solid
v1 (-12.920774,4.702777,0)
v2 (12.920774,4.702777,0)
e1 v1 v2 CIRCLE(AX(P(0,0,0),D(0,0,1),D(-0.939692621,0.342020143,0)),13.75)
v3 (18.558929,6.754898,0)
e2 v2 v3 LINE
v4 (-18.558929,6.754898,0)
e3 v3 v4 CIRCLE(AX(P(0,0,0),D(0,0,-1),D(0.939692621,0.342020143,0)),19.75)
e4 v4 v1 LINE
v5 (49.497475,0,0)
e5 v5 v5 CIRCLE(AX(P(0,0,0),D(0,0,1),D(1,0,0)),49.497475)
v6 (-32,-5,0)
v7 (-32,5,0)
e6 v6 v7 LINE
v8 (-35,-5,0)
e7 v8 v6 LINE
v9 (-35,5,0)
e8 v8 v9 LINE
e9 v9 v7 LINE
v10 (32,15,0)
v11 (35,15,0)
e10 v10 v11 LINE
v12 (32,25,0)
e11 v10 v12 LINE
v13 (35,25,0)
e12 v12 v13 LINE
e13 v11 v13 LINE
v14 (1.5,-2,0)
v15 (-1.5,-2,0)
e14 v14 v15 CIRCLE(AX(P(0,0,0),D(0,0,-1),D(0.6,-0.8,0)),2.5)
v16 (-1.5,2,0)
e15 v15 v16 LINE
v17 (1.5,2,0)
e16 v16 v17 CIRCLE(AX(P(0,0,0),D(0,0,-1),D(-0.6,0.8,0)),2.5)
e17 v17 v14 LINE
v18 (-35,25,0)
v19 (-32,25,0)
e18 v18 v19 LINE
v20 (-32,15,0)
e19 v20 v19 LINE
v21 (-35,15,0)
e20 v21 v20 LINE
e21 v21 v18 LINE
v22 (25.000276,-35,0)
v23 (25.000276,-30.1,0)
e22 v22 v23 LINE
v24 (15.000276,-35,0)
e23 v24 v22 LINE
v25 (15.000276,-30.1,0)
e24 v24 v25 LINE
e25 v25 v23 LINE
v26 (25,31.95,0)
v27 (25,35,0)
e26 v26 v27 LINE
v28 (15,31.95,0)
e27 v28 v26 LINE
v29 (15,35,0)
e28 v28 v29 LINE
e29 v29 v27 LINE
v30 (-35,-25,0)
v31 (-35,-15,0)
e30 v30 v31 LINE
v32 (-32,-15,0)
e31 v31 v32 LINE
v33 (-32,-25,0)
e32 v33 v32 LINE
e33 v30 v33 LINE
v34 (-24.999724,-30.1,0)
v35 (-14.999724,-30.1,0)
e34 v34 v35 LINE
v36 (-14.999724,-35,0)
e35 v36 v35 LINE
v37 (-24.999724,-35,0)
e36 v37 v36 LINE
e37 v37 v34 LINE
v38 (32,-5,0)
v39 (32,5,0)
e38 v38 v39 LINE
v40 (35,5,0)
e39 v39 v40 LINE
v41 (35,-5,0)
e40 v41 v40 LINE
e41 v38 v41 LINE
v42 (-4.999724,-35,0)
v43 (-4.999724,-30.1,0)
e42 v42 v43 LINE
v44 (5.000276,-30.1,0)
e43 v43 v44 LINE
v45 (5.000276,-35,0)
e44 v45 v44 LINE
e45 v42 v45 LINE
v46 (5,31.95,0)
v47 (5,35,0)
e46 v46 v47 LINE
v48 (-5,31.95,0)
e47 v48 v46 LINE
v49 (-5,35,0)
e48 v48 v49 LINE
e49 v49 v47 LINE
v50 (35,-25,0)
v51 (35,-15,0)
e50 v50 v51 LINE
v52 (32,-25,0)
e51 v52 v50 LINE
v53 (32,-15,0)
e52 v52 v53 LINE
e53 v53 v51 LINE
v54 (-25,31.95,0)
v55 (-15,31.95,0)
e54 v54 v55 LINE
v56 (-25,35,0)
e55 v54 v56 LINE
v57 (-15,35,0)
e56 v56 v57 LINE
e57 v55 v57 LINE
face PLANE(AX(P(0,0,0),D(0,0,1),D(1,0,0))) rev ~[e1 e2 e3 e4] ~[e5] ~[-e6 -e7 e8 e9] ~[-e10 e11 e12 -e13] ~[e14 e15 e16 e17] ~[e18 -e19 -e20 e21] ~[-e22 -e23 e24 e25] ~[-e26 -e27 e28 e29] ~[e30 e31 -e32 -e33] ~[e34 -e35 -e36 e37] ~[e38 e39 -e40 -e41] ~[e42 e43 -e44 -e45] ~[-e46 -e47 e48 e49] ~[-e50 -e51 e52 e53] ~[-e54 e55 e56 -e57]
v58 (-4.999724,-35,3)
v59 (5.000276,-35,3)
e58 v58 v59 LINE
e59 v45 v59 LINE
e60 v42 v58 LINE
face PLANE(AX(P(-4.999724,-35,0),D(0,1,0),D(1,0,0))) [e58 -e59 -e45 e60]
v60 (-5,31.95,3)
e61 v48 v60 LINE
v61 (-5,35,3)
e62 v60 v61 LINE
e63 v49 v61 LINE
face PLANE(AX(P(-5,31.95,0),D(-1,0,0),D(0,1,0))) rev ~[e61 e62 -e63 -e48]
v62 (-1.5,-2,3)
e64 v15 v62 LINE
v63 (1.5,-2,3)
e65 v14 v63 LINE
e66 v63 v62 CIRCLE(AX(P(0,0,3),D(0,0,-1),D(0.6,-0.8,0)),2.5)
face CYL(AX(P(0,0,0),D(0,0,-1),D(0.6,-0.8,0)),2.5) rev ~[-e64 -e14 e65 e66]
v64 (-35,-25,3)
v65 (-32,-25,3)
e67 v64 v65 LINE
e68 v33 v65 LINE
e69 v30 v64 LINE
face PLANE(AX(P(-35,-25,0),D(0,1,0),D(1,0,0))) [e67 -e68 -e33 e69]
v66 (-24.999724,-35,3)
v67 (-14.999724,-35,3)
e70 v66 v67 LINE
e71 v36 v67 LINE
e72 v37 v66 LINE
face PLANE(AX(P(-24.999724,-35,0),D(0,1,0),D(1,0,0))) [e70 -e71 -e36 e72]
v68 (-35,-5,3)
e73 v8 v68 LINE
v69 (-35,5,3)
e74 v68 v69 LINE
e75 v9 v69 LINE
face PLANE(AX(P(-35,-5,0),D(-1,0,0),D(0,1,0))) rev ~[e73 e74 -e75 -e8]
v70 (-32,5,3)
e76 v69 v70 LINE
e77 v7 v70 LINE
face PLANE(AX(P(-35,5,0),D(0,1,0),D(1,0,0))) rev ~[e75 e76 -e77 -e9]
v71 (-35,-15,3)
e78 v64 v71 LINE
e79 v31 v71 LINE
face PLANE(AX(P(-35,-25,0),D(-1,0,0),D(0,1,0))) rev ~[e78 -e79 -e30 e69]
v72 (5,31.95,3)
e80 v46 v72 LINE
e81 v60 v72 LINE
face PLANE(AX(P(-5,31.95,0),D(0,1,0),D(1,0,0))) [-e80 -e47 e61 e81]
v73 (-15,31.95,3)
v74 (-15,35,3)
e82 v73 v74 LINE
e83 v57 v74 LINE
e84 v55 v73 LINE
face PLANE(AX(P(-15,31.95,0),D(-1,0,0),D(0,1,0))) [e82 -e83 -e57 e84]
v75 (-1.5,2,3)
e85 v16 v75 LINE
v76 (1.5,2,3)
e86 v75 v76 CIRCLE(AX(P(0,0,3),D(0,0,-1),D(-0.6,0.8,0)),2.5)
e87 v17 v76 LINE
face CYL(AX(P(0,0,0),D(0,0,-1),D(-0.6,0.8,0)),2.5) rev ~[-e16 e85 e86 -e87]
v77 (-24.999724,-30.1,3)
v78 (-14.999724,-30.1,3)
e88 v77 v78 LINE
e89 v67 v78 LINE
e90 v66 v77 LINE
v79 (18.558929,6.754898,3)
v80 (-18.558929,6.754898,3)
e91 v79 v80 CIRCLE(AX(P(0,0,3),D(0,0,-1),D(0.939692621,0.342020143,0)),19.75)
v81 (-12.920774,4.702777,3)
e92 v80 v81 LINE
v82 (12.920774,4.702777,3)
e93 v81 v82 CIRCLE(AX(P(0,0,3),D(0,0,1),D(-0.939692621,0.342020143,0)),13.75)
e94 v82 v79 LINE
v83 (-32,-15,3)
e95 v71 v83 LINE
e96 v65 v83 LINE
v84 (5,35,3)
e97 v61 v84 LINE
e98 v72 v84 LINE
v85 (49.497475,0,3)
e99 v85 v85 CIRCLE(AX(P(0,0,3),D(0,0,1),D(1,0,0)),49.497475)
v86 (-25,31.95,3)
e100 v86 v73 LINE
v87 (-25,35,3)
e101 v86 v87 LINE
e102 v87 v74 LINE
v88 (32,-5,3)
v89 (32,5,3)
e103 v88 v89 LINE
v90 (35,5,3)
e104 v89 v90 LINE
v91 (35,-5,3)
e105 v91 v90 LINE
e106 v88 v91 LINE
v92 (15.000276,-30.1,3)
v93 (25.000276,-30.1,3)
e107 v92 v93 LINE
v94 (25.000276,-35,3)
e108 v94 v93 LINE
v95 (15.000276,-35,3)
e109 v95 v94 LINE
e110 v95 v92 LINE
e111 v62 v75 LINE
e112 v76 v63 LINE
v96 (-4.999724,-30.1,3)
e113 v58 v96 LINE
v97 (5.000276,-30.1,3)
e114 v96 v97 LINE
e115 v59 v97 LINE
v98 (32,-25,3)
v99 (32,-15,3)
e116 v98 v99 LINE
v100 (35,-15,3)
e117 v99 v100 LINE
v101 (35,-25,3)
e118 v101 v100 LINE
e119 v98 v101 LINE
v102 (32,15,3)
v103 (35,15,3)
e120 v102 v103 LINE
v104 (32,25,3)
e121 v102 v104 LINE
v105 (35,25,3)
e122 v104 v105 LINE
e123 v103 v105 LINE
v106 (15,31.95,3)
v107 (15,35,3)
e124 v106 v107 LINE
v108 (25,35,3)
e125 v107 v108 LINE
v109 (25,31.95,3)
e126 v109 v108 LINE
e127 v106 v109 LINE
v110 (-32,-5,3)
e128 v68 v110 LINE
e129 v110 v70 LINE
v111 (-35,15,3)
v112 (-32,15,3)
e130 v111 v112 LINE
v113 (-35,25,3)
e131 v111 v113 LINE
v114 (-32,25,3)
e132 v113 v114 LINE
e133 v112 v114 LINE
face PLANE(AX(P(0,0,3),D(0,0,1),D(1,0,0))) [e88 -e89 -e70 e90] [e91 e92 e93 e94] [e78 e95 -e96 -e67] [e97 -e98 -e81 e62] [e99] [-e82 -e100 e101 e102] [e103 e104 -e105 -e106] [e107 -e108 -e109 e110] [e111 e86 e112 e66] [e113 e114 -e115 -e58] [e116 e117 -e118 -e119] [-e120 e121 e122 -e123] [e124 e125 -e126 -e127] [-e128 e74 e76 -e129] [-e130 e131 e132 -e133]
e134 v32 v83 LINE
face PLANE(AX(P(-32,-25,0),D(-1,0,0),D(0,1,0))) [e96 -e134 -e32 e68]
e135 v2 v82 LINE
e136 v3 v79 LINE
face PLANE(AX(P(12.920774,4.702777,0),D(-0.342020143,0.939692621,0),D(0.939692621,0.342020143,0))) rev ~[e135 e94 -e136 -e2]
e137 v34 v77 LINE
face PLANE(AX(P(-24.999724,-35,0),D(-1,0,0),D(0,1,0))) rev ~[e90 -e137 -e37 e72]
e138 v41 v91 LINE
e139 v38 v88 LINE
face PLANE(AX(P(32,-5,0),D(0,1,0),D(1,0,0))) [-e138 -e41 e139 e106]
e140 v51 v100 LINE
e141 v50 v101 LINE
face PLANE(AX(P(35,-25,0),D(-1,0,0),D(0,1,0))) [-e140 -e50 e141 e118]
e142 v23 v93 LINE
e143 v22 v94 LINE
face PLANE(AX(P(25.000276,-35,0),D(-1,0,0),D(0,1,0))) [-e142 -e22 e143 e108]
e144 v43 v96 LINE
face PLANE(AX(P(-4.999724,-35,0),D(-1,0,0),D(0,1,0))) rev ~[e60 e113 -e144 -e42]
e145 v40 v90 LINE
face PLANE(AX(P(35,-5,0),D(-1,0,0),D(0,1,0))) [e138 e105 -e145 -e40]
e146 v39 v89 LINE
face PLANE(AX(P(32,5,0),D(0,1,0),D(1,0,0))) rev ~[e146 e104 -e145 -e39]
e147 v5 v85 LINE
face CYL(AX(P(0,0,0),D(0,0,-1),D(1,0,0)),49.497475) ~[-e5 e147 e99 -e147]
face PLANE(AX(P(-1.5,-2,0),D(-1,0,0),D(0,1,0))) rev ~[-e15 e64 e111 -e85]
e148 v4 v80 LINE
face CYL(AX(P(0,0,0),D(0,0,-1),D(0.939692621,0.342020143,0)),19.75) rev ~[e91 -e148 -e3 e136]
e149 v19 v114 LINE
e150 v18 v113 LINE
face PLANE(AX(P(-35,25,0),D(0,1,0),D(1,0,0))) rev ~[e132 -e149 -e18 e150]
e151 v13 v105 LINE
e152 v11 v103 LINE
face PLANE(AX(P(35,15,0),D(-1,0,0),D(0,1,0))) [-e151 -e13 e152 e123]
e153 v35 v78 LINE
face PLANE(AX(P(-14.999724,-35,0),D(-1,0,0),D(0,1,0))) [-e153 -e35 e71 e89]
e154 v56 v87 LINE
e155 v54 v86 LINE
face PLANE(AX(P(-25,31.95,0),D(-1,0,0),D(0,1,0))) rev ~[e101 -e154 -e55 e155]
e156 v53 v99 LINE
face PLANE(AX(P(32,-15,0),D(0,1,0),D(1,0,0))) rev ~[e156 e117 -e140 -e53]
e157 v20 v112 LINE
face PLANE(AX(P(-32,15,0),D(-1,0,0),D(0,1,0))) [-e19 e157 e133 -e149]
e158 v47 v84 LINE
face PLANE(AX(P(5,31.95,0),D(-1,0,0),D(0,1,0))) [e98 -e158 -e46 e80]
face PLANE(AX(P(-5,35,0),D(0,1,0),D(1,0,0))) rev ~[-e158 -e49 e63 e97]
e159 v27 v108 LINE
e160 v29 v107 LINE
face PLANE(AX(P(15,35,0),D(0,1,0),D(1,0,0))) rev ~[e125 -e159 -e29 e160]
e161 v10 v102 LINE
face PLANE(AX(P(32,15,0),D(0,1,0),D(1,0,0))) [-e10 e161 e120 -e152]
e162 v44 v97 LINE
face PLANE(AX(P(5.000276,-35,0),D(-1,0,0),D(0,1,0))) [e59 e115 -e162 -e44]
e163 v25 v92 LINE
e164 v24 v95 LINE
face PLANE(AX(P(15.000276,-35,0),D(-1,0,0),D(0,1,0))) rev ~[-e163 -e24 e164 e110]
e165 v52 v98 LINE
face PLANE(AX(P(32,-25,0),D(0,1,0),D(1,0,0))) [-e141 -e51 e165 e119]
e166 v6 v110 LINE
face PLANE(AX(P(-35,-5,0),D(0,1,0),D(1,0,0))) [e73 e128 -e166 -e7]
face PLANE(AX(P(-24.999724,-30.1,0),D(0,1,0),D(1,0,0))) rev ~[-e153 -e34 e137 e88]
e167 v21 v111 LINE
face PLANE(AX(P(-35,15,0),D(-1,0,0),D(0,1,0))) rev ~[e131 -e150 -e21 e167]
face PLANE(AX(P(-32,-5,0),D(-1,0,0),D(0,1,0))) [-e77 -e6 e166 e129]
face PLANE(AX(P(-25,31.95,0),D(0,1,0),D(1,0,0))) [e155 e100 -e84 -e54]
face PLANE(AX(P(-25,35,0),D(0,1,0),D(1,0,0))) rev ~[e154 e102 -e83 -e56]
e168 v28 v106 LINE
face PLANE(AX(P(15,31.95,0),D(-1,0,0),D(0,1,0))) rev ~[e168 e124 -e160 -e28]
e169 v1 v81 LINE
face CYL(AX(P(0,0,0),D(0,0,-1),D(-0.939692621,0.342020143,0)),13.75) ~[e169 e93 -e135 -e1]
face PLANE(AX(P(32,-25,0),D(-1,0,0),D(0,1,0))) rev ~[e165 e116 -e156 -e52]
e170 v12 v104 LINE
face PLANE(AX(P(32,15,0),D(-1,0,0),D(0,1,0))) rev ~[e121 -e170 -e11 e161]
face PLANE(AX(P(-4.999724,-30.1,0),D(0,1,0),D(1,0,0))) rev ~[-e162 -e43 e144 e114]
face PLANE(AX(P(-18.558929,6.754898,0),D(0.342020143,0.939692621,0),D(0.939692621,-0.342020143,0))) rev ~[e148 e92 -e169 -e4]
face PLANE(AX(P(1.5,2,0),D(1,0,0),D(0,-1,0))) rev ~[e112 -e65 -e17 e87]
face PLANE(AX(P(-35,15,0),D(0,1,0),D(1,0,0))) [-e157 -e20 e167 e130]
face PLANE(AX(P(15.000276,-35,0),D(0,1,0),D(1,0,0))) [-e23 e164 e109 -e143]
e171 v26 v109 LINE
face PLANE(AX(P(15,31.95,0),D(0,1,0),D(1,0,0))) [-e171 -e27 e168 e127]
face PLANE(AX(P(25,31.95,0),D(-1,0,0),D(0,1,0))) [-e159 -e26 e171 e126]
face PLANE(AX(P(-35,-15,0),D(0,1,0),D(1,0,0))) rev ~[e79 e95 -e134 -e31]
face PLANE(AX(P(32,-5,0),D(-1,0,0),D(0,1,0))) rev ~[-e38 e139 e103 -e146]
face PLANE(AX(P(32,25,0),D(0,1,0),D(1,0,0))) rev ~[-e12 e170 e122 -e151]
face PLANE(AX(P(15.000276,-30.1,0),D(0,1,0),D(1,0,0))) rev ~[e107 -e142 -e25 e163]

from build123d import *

# Parameters (mm, degrees)
F0_R     = 49.4974746831
F0_W     = 10
F0_H     = 4.9
F0_W_2   = 3
F0_H_2   = 10
F0_H_3   = 3.05
F1_DEPTH = 3


with BuildPart() as f1:
    # F0 (on Top) → F1 (new body)
    with BuildSketch(Plane.XY):
        Circle(F0_R)
        with Locations((-19.9997237325, -32.55)):
            Rectangle(F0_W, F0_H, mode=Mode.SUBTRACT)
        with Locations((-33.5, -20)):
            Rectangle(F0_W_2, F0_H_2, mode=Mode.SUBTRACT)
        with Locations((0.0002762675, -32.55)):
            Rectangle(F0_W, F0_H, mode=Mode.SUBTRACT)
        with Locations((20.0002762675, -32.55)):
            Rectangle(F0_W, F0_H, mode=Mode.SUBTRACT)
        with BuildLine():
            ThreePointArc((18.5589292605, 6.7548978307), (0, -19.75), (-18.5589292605, 6.7548978307))
            Line((-18.5589292605, 6.7548978307), (-12.9207735358, 4.7027769707))
            ThreePointArc((-12.9207735358, 4.7027769707), (0, -13.75), (12.9207735358, 4.7027769707))
            Line((12.9207735358, 4.7027769707), (18.5589292605, 6.7548978307))
        make_face(mode=Mode.SUBTRACT)
        with Locations((33.5, -20)):
            Rectangle(F0_W_2, F0_H_2, mode=Mode.SUBTRACT)
        with Locations((-33.5, 0)):
            Rectangle(F0_W_2, F0_H_2, mode=Mode.SUBTRACT)
        with Locations((-33.5, 20)):
            Rectangle(F0_W_2, F0_H_2, mode=Mode.SUBTRACT)
        with Locations((-20, 33.475)):
            Rectangle(F0_W, F0_H_3, mode=Mode.SUBTRACT)
        with BuildLine():
            ThreePointArc((-1.5, 2), (0, 2.5), (1.5, 2))
            Line((1.5, 2), (1.5, -2))
            ThreePointArc((1.5, -2), (0, -2.5), (-1.5, -2))
            Line((-1.5, -2), (-1.5, 2))
        make_face(mode=Mode.SUBTRACT)
        with Locations((33.5, 0)):
            Rectangle(F0_W_2, F0_H_2, mode=Mode.SUBTRACT)
        with Locations((33.5, 20)):
            Rectangle(F0_W_2, F0_H_2, mode=Mode.SUBTRACT)
        with Locations((0, 33.475)):
            Rectangle(F0_W, F0_H_3, mode=Mode.SUBTRACT)
        with Locations((20, 33.475)):
            Rectangle(F0_W, F0_H_3, mode=Mode.SUBTRACT)
    extrude(amount=F1_DEPTH)


solid = f1.part
